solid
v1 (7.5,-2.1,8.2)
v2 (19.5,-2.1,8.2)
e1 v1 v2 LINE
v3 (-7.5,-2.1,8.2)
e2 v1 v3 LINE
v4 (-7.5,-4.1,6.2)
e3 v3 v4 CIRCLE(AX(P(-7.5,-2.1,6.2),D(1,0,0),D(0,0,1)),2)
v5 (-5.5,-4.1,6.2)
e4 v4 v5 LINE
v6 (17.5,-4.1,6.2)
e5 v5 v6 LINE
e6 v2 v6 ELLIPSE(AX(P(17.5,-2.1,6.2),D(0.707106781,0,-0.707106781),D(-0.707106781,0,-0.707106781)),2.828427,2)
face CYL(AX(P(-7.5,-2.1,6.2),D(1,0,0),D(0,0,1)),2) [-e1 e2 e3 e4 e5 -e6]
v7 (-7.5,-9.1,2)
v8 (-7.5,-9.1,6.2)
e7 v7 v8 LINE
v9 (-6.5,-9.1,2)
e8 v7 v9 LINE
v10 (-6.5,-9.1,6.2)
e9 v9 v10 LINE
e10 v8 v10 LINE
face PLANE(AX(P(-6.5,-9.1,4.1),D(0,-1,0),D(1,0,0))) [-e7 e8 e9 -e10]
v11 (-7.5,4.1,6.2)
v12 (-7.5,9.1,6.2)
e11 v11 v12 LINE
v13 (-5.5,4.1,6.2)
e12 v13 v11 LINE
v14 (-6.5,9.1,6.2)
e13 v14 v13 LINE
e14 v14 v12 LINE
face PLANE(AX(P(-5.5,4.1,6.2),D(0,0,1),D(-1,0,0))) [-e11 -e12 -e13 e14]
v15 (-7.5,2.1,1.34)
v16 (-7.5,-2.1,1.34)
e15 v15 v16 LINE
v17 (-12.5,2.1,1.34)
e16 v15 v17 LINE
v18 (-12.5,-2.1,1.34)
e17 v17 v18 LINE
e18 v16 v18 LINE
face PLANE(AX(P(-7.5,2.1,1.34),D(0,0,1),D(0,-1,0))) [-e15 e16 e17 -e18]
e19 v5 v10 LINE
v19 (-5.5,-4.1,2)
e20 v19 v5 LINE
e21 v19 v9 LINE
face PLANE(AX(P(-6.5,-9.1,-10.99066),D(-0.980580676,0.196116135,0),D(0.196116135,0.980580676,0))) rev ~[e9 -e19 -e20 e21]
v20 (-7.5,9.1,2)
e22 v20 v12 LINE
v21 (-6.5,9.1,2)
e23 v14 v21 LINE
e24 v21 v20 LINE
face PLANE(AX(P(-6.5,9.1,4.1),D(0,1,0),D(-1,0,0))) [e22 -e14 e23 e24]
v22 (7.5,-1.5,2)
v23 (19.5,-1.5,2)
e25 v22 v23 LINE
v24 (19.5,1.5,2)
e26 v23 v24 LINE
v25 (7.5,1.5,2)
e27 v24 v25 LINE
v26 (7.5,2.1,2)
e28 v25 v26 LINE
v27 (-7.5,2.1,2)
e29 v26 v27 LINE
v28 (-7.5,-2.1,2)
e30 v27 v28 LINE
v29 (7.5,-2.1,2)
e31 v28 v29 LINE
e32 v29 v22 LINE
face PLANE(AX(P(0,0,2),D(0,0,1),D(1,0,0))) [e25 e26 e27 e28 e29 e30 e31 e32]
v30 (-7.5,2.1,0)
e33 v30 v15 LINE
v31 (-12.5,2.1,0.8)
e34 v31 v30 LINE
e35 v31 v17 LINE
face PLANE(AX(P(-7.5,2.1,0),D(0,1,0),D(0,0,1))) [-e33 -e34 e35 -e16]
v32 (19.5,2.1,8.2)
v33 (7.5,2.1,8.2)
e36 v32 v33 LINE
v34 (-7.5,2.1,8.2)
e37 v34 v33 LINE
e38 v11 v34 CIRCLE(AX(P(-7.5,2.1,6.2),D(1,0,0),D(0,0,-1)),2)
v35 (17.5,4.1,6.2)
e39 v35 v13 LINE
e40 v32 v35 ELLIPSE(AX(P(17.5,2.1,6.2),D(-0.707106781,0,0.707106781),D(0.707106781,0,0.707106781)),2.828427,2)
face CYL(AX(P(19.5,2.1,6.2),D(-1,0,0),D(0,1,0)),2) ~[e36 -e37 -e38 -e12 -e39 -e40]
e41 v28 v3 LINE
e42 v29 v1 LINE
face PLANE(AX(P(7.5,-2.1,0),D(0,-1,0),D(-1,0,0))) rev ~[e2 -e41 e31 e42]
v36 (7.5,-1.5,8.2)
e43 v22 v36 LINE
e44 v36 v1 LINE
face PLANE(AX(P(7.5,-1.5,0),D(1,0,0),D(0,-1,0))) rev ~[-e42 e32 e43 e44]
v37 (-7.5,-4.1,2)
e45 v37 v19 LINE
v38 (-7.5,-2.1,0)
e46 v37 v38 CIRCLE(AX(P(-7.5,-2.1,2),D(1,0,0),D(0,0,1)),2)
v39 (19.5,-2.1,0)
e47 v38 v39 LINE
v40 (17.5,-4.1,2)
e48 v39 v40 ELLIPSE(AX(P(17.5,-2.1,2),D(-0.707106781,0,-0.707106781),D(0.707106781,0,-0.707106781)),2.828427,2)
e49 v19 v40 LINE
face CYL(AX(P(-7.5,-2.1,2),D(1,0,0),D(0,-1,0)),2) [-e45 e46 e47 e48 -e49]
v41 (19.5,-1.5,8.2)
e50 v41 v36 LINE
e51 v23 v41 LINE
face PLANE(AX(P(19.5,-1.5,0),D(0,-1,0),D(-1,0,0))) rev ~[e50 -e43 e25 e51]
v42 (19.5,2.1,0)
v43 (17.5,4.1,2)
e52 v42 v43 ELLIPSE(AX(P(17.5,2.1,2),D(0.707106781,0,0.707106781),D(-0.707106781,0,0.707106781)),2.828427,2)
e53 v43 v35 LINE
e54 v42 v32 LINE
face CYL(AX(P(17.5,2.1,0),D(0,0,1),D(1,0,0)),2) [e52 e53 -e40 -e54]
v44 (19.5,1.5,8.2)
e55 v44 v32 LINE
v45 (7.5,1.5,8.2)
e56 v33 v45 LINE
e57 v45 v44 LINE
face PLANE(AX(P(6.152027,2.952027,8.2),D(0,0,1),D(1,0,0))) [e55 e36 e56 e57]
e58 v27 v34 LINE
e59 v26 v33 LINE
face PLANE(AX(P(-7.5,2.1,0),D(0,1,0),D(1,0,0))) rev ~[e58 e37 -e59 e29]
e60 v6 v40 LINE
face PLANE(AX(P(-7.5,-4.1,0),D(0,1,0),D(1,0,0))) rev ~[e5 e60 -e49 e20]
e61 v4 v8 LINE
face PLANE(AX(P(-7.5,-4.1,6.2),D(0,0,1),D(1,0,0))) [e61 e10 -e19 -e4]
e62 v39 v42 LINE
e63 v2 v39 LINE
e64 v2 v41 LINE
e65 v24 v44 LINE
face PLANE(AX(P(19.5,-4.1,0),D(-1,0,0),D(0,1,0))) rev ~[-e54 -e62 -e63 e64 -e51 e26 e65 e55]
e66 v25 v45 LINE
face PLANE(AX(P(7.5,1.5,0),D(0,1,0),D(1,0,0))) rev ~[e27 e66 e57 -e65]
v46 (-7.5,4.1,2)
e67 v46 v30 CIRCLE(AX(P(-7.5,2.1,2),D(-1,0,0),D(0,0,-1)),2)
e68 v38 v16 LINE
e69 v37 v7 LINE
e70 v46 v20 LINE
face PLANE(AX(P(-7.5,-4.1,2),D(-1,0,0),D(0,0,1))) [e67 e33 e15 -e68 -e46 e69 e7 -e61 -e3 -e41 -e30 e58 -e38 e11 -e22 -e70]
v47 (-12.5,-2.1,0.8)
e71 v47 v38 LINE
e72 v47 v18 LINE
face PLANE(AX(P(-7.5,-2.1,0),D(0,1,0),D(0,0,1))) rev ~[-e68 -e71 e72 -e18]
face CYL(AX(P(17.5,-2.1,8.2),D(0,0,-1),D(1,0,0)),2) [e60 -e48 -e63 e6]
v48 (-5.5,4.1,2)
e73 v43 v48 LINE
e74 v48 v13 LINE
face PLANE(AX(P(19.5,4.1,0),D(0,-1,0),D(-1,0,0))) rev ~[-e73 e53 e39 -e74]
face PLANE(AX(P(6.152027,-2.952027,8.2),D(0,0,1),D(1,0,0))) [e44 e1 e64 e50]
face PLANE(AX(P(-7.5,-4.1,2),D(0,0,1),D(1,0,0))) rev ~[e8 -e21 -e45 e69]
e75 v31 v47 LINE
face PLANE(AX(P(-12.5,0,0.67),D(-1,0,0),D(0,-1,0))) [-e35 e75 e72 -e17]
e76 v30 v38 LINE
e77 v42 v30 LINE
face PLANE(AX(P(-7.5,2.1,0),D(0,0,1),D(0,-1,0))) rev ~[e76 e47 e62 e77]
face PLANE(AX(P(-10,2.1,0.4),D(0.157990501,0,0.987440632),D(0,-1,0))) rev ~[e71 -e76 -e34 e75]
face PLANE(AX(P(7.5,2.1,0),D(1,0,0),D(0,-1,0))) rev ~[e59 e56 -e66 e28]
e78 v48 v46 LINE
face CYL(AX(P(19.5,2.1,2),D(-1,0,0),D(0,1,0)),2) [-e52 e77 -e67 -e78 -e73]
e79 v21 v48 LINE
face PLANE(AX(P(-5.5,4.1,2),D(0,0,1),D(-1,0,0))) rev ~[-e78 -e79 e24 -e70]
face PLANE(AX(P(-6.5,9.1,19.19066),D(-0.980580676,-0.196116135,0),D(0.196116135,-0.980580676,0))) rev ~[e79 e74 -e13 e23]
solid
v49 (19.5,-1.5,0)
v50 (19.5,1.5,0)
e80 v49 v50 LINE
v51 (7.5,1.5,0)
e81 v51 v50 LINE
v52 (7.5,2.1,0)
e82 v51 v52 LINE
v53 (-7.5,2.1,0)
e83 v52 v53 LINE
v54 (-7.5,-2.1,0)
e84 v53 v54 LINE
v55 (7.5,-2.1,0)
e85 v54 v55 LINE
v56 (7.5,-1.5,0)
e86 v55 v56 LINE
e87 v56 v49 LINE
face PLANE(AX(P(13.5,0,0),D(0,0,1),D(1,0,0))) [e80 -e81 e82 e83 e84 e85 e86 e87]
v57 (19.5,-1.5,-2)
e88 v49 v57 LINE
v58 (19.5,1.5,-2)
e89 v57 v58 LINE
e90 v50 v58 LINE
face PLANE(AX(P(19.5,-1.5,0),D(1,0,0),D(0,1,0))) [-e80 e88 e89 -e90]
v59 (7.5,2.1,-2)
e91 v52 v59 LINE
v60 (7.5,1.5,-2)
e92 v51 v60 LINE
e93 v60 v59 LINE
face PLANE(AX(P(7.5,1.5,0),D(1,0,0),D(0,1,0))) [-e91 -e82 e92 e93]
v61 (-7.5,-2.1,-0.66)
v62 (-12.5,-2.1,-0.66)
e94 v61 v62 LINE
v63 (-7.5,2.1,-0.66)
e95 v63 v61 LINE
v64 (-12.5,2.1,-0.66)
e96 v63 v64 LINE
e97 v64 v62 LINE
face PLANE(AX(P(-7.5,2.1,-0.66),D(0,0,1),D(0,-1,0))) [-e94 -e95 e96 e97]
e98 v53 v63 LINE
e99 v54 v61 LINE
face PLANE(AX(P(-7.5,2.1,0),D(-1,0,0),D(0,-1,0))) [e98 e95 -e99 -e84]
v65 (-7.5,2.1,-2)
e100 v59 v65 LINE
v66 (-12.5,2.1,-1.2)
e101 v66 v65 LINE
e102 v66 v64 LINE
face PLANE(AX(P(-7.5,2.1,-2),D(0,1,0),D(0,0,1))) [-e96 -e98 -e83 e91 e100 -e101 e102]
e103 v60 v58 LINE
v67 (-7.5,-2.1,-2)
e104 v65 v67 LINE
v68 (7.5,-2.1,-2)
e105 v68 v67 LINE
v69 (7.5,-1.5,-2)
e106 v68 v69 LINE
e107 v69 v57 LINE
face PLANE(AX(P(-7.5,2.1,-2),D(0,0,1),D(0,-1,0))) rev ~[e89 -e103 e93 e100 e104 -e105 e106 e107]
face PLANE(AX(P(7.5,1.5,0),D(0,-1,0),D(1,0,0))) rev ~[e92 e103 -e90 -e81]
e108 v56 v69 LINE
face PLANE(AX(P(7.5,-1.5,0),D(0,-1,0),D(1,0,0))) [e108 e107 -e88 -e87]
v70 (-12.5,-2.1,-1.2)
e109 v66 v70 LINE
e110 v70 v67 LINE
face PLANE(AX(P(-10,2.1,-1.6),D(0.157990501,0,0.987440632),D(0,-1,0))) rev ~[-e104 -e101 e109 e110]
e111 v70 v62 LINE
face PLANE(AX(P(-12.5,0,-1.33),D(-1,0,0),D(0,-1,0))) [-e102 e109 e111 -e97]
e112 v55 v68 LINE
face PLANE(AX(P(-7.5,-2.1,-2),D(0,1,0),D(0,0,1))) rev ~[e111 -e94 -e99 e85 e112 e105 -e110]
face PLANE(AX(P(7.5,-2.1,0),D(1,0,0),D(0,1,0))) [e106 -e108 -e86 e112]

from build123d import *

# Parameters (mm, degrees)
F0_W         = 12
F0_H         = 3
F1_DEPTH     = 2
F2_DEPTH     = 8.2
F3_R         = 2
F4_DEPTH     = 2
F5_W         = 4.2
F5_H         = 1.34
F6_DEPTH     = 5
F7_W         = 4.2
F7_H         = 1.34
F8_DEPTH     = 5
F9_SIZE2     = 5
F9_SIZE      = 0.8
F9_2_SIZE2   = 5
F9_2_SIZE    = 0.8
F11_W        = 2
F11_H        = 4.2
F12_DEPTH    = 5
F10_W        = 2
F10_H        = 4.2
F13_DEPTH    = 5
F14_T4_DEPTH = 30.181320863
F14_T9_DEPTH = 30.181320863


# Not quite as in the source:
# - a fillet or chamfer that OpenCascade refuses, or shapes differently, is made with other operations: its cross-section is extruded or revolved along the edge and cut away or added
# - two fillets or chamfers of one size are made in one step


with BuildPart() as f1:
    # F0 (on Top) → F1 (new body)
    with BuildSketch(Plane.XY):
        Polygon((7.5, 1.5), (7.5, 2.1), (-7.5, 2.1), (-7.5, -2.1), (7.5, -2.1), (7.5, -1.5), align=None)
        with Locations((13.5, 0)):
            Rectangle(F0_W, F0_H)
        Polygon((-7.5, 2.1), (7.5, 2.1), (7.5, 1.5), (19.5, 1.5), (19.5, 4.1), (-7.5, 4.1), align=None)
        Polygon((7.5, -2.1), (-7.5, -2.1), (-7.5, -4.1), (19.5, -4.1), (19.5, -1.5), (7.5, -1.5), align=None)
    extrude(amount=F1_DEPTH)

    # F0 (on Top) → F2 (join)
    with BuildSketch(Plane.XY):
        Polygon((7.5, -2.1), (-7.5, -2.1), (-7.5, -4.1), (19.5, -4.1), (19.5, -1.5), (7.5, -1.5), align=None)
        Polygon((-7.5, 2.1), (7.5, 2.1), (7.5, 1.5), (19.5, 1.5), (19.5, 4.1), (-7.5, 4.1), align=None)
    extrude(amount=F2_DEPTH)

    # F3
    f3_edges = [f1.edges().sort_by_distance(p)[0] for p in [
        (19.5, -4.1, 4.1),
        (19.5, 4.1, 4.1),
        (6, -4.1, 8.2),
        (6, 4.1, 8.2),
        (6, 4.1, 0),
        (6, -4.1, 0),
    ]]
    fillet(f3_edges, radius=F3_R)

    # F7 (on face) → F8 (join)
    with BuildSketch(Plane(origin=(-7.5, 0, 0), x_dir=(0, -1, 0), z_dir=(-1, 0, 0))):
        with Locations((0, 0.67)):
            Rectangle(F7_W, F7_H)
    extrude(amount=F8_DEPTH)

    # F9#2
    f9_2_edges = [f1.edges().sort_by_distance(p)[0] for p in [
        (-12.5, 0, 0),
    ]]
    f9_2_side = f1.faces().sort_by_distance((-12.5, 0, 0.67))[0]
    chamfer(f9_2_edges, length=F9_2_SIZE, length2=F9_2_SIZE2, reference=f9_2_side)

    # F11 (on face) → F12 (join)
    with BuildSketch(Plane(origin=(0, 4.1, 0), x_dir=(-1, 0, 0), z_dir=(0, 1, 0))):
        with Locations((6.5, 4.1)):
            Rectangle(F11_W, F11_H)
    extrude(amount=F12_DEPTH)

    # F10 (on face) → F13 (join)
    with BuildSketch(Plane.XZ.offset(4.1)):
        with Locations((-6.5, 4.1)):
            Rectangle(F10_W, F10_H)
    extrude(amount=F13_DEPTH)

    # F14: chamfer of 1 x 5 on 2 edges, made by hand


with BuildPart() as f4:
    # F0 (on Top) → F4 (new body)
    with BuildSketch(Plane.XY):
        with Locations((13.5, 0)):
            Rectangle(F0_W, F0_H)
        Polygon((7.5, 1.5), (7.5, 2.1), (-7.5, 2.1), (-7.5, -2.1), (7.5, -2.1), (7.5, -1.5), align=None)
    extrude(amount=-F4_DEPTH)

    # F5 (on face) → F6 (join)
    with BuildSketch(Plane(origin=(-7.5, 0, 0), x_dir=(0, -1, 0), z_dir=(-1, 0, 0))):
        with Locations((0, -1.33)):
            Rectangle(F5_W, F5_H)
    extrude(amount=F6_DEPTH)

    # F9
    f9_edges = [f4.edges().sort_by_distance(p)[0] for p in [
        (-12.5, 0, -2),
    ]]
    f9_side = f4.faces().sort_by_distance((-12.5, 0, -1.33))[0]
    chamfer(f9_edges, length=F9_SIZE, length2=F9_SIZE2, reference=f9_side)


with BuildPart() as f14_tool2:
    # F14_s3 → F14_t4 (new body)
    with BuildSketch(Plane.XY.offset(-10.9906604315)):
        Polygon((-6.5, -9.1), (-5.5, -4.1), (-5.5, -9.1), align=None)
    extrude(amount=F14_T4_DEPTH)

    split(bisect_by=Plane.XZ.offset(4.1), keep=Keep.TOP)


with BuildPart() as f1_1:
    add(f1.part)

    # F14_t1: cut F14_tool2
    add(f14_tool2.part, mode=Mode.SUBTRACT)


with BuildPart() as f14_tool7:
    # F14_s8 → F14_t9 (new body)
    with BuildSketch(Plane.XY.offset(19.1906604315)):
        Polygon((-6.5, 9.1), (-5.5, 4.1), (-5.5, 9.1), align=None)
    extrude(amount=-F14_T9_DEPTH)

    split(bisect_by=Plane.XZ.offset(-4.1), keep=Keep.BOTTOM)


with BuildPart() as f1_2:
    add(f1_1.part)

    # F14_t6: cut F14_tool7
    add(f14_tool7.part, mode=Mode.SUBTRACT)


solid = Compound([f4.part, f1_2.part])
